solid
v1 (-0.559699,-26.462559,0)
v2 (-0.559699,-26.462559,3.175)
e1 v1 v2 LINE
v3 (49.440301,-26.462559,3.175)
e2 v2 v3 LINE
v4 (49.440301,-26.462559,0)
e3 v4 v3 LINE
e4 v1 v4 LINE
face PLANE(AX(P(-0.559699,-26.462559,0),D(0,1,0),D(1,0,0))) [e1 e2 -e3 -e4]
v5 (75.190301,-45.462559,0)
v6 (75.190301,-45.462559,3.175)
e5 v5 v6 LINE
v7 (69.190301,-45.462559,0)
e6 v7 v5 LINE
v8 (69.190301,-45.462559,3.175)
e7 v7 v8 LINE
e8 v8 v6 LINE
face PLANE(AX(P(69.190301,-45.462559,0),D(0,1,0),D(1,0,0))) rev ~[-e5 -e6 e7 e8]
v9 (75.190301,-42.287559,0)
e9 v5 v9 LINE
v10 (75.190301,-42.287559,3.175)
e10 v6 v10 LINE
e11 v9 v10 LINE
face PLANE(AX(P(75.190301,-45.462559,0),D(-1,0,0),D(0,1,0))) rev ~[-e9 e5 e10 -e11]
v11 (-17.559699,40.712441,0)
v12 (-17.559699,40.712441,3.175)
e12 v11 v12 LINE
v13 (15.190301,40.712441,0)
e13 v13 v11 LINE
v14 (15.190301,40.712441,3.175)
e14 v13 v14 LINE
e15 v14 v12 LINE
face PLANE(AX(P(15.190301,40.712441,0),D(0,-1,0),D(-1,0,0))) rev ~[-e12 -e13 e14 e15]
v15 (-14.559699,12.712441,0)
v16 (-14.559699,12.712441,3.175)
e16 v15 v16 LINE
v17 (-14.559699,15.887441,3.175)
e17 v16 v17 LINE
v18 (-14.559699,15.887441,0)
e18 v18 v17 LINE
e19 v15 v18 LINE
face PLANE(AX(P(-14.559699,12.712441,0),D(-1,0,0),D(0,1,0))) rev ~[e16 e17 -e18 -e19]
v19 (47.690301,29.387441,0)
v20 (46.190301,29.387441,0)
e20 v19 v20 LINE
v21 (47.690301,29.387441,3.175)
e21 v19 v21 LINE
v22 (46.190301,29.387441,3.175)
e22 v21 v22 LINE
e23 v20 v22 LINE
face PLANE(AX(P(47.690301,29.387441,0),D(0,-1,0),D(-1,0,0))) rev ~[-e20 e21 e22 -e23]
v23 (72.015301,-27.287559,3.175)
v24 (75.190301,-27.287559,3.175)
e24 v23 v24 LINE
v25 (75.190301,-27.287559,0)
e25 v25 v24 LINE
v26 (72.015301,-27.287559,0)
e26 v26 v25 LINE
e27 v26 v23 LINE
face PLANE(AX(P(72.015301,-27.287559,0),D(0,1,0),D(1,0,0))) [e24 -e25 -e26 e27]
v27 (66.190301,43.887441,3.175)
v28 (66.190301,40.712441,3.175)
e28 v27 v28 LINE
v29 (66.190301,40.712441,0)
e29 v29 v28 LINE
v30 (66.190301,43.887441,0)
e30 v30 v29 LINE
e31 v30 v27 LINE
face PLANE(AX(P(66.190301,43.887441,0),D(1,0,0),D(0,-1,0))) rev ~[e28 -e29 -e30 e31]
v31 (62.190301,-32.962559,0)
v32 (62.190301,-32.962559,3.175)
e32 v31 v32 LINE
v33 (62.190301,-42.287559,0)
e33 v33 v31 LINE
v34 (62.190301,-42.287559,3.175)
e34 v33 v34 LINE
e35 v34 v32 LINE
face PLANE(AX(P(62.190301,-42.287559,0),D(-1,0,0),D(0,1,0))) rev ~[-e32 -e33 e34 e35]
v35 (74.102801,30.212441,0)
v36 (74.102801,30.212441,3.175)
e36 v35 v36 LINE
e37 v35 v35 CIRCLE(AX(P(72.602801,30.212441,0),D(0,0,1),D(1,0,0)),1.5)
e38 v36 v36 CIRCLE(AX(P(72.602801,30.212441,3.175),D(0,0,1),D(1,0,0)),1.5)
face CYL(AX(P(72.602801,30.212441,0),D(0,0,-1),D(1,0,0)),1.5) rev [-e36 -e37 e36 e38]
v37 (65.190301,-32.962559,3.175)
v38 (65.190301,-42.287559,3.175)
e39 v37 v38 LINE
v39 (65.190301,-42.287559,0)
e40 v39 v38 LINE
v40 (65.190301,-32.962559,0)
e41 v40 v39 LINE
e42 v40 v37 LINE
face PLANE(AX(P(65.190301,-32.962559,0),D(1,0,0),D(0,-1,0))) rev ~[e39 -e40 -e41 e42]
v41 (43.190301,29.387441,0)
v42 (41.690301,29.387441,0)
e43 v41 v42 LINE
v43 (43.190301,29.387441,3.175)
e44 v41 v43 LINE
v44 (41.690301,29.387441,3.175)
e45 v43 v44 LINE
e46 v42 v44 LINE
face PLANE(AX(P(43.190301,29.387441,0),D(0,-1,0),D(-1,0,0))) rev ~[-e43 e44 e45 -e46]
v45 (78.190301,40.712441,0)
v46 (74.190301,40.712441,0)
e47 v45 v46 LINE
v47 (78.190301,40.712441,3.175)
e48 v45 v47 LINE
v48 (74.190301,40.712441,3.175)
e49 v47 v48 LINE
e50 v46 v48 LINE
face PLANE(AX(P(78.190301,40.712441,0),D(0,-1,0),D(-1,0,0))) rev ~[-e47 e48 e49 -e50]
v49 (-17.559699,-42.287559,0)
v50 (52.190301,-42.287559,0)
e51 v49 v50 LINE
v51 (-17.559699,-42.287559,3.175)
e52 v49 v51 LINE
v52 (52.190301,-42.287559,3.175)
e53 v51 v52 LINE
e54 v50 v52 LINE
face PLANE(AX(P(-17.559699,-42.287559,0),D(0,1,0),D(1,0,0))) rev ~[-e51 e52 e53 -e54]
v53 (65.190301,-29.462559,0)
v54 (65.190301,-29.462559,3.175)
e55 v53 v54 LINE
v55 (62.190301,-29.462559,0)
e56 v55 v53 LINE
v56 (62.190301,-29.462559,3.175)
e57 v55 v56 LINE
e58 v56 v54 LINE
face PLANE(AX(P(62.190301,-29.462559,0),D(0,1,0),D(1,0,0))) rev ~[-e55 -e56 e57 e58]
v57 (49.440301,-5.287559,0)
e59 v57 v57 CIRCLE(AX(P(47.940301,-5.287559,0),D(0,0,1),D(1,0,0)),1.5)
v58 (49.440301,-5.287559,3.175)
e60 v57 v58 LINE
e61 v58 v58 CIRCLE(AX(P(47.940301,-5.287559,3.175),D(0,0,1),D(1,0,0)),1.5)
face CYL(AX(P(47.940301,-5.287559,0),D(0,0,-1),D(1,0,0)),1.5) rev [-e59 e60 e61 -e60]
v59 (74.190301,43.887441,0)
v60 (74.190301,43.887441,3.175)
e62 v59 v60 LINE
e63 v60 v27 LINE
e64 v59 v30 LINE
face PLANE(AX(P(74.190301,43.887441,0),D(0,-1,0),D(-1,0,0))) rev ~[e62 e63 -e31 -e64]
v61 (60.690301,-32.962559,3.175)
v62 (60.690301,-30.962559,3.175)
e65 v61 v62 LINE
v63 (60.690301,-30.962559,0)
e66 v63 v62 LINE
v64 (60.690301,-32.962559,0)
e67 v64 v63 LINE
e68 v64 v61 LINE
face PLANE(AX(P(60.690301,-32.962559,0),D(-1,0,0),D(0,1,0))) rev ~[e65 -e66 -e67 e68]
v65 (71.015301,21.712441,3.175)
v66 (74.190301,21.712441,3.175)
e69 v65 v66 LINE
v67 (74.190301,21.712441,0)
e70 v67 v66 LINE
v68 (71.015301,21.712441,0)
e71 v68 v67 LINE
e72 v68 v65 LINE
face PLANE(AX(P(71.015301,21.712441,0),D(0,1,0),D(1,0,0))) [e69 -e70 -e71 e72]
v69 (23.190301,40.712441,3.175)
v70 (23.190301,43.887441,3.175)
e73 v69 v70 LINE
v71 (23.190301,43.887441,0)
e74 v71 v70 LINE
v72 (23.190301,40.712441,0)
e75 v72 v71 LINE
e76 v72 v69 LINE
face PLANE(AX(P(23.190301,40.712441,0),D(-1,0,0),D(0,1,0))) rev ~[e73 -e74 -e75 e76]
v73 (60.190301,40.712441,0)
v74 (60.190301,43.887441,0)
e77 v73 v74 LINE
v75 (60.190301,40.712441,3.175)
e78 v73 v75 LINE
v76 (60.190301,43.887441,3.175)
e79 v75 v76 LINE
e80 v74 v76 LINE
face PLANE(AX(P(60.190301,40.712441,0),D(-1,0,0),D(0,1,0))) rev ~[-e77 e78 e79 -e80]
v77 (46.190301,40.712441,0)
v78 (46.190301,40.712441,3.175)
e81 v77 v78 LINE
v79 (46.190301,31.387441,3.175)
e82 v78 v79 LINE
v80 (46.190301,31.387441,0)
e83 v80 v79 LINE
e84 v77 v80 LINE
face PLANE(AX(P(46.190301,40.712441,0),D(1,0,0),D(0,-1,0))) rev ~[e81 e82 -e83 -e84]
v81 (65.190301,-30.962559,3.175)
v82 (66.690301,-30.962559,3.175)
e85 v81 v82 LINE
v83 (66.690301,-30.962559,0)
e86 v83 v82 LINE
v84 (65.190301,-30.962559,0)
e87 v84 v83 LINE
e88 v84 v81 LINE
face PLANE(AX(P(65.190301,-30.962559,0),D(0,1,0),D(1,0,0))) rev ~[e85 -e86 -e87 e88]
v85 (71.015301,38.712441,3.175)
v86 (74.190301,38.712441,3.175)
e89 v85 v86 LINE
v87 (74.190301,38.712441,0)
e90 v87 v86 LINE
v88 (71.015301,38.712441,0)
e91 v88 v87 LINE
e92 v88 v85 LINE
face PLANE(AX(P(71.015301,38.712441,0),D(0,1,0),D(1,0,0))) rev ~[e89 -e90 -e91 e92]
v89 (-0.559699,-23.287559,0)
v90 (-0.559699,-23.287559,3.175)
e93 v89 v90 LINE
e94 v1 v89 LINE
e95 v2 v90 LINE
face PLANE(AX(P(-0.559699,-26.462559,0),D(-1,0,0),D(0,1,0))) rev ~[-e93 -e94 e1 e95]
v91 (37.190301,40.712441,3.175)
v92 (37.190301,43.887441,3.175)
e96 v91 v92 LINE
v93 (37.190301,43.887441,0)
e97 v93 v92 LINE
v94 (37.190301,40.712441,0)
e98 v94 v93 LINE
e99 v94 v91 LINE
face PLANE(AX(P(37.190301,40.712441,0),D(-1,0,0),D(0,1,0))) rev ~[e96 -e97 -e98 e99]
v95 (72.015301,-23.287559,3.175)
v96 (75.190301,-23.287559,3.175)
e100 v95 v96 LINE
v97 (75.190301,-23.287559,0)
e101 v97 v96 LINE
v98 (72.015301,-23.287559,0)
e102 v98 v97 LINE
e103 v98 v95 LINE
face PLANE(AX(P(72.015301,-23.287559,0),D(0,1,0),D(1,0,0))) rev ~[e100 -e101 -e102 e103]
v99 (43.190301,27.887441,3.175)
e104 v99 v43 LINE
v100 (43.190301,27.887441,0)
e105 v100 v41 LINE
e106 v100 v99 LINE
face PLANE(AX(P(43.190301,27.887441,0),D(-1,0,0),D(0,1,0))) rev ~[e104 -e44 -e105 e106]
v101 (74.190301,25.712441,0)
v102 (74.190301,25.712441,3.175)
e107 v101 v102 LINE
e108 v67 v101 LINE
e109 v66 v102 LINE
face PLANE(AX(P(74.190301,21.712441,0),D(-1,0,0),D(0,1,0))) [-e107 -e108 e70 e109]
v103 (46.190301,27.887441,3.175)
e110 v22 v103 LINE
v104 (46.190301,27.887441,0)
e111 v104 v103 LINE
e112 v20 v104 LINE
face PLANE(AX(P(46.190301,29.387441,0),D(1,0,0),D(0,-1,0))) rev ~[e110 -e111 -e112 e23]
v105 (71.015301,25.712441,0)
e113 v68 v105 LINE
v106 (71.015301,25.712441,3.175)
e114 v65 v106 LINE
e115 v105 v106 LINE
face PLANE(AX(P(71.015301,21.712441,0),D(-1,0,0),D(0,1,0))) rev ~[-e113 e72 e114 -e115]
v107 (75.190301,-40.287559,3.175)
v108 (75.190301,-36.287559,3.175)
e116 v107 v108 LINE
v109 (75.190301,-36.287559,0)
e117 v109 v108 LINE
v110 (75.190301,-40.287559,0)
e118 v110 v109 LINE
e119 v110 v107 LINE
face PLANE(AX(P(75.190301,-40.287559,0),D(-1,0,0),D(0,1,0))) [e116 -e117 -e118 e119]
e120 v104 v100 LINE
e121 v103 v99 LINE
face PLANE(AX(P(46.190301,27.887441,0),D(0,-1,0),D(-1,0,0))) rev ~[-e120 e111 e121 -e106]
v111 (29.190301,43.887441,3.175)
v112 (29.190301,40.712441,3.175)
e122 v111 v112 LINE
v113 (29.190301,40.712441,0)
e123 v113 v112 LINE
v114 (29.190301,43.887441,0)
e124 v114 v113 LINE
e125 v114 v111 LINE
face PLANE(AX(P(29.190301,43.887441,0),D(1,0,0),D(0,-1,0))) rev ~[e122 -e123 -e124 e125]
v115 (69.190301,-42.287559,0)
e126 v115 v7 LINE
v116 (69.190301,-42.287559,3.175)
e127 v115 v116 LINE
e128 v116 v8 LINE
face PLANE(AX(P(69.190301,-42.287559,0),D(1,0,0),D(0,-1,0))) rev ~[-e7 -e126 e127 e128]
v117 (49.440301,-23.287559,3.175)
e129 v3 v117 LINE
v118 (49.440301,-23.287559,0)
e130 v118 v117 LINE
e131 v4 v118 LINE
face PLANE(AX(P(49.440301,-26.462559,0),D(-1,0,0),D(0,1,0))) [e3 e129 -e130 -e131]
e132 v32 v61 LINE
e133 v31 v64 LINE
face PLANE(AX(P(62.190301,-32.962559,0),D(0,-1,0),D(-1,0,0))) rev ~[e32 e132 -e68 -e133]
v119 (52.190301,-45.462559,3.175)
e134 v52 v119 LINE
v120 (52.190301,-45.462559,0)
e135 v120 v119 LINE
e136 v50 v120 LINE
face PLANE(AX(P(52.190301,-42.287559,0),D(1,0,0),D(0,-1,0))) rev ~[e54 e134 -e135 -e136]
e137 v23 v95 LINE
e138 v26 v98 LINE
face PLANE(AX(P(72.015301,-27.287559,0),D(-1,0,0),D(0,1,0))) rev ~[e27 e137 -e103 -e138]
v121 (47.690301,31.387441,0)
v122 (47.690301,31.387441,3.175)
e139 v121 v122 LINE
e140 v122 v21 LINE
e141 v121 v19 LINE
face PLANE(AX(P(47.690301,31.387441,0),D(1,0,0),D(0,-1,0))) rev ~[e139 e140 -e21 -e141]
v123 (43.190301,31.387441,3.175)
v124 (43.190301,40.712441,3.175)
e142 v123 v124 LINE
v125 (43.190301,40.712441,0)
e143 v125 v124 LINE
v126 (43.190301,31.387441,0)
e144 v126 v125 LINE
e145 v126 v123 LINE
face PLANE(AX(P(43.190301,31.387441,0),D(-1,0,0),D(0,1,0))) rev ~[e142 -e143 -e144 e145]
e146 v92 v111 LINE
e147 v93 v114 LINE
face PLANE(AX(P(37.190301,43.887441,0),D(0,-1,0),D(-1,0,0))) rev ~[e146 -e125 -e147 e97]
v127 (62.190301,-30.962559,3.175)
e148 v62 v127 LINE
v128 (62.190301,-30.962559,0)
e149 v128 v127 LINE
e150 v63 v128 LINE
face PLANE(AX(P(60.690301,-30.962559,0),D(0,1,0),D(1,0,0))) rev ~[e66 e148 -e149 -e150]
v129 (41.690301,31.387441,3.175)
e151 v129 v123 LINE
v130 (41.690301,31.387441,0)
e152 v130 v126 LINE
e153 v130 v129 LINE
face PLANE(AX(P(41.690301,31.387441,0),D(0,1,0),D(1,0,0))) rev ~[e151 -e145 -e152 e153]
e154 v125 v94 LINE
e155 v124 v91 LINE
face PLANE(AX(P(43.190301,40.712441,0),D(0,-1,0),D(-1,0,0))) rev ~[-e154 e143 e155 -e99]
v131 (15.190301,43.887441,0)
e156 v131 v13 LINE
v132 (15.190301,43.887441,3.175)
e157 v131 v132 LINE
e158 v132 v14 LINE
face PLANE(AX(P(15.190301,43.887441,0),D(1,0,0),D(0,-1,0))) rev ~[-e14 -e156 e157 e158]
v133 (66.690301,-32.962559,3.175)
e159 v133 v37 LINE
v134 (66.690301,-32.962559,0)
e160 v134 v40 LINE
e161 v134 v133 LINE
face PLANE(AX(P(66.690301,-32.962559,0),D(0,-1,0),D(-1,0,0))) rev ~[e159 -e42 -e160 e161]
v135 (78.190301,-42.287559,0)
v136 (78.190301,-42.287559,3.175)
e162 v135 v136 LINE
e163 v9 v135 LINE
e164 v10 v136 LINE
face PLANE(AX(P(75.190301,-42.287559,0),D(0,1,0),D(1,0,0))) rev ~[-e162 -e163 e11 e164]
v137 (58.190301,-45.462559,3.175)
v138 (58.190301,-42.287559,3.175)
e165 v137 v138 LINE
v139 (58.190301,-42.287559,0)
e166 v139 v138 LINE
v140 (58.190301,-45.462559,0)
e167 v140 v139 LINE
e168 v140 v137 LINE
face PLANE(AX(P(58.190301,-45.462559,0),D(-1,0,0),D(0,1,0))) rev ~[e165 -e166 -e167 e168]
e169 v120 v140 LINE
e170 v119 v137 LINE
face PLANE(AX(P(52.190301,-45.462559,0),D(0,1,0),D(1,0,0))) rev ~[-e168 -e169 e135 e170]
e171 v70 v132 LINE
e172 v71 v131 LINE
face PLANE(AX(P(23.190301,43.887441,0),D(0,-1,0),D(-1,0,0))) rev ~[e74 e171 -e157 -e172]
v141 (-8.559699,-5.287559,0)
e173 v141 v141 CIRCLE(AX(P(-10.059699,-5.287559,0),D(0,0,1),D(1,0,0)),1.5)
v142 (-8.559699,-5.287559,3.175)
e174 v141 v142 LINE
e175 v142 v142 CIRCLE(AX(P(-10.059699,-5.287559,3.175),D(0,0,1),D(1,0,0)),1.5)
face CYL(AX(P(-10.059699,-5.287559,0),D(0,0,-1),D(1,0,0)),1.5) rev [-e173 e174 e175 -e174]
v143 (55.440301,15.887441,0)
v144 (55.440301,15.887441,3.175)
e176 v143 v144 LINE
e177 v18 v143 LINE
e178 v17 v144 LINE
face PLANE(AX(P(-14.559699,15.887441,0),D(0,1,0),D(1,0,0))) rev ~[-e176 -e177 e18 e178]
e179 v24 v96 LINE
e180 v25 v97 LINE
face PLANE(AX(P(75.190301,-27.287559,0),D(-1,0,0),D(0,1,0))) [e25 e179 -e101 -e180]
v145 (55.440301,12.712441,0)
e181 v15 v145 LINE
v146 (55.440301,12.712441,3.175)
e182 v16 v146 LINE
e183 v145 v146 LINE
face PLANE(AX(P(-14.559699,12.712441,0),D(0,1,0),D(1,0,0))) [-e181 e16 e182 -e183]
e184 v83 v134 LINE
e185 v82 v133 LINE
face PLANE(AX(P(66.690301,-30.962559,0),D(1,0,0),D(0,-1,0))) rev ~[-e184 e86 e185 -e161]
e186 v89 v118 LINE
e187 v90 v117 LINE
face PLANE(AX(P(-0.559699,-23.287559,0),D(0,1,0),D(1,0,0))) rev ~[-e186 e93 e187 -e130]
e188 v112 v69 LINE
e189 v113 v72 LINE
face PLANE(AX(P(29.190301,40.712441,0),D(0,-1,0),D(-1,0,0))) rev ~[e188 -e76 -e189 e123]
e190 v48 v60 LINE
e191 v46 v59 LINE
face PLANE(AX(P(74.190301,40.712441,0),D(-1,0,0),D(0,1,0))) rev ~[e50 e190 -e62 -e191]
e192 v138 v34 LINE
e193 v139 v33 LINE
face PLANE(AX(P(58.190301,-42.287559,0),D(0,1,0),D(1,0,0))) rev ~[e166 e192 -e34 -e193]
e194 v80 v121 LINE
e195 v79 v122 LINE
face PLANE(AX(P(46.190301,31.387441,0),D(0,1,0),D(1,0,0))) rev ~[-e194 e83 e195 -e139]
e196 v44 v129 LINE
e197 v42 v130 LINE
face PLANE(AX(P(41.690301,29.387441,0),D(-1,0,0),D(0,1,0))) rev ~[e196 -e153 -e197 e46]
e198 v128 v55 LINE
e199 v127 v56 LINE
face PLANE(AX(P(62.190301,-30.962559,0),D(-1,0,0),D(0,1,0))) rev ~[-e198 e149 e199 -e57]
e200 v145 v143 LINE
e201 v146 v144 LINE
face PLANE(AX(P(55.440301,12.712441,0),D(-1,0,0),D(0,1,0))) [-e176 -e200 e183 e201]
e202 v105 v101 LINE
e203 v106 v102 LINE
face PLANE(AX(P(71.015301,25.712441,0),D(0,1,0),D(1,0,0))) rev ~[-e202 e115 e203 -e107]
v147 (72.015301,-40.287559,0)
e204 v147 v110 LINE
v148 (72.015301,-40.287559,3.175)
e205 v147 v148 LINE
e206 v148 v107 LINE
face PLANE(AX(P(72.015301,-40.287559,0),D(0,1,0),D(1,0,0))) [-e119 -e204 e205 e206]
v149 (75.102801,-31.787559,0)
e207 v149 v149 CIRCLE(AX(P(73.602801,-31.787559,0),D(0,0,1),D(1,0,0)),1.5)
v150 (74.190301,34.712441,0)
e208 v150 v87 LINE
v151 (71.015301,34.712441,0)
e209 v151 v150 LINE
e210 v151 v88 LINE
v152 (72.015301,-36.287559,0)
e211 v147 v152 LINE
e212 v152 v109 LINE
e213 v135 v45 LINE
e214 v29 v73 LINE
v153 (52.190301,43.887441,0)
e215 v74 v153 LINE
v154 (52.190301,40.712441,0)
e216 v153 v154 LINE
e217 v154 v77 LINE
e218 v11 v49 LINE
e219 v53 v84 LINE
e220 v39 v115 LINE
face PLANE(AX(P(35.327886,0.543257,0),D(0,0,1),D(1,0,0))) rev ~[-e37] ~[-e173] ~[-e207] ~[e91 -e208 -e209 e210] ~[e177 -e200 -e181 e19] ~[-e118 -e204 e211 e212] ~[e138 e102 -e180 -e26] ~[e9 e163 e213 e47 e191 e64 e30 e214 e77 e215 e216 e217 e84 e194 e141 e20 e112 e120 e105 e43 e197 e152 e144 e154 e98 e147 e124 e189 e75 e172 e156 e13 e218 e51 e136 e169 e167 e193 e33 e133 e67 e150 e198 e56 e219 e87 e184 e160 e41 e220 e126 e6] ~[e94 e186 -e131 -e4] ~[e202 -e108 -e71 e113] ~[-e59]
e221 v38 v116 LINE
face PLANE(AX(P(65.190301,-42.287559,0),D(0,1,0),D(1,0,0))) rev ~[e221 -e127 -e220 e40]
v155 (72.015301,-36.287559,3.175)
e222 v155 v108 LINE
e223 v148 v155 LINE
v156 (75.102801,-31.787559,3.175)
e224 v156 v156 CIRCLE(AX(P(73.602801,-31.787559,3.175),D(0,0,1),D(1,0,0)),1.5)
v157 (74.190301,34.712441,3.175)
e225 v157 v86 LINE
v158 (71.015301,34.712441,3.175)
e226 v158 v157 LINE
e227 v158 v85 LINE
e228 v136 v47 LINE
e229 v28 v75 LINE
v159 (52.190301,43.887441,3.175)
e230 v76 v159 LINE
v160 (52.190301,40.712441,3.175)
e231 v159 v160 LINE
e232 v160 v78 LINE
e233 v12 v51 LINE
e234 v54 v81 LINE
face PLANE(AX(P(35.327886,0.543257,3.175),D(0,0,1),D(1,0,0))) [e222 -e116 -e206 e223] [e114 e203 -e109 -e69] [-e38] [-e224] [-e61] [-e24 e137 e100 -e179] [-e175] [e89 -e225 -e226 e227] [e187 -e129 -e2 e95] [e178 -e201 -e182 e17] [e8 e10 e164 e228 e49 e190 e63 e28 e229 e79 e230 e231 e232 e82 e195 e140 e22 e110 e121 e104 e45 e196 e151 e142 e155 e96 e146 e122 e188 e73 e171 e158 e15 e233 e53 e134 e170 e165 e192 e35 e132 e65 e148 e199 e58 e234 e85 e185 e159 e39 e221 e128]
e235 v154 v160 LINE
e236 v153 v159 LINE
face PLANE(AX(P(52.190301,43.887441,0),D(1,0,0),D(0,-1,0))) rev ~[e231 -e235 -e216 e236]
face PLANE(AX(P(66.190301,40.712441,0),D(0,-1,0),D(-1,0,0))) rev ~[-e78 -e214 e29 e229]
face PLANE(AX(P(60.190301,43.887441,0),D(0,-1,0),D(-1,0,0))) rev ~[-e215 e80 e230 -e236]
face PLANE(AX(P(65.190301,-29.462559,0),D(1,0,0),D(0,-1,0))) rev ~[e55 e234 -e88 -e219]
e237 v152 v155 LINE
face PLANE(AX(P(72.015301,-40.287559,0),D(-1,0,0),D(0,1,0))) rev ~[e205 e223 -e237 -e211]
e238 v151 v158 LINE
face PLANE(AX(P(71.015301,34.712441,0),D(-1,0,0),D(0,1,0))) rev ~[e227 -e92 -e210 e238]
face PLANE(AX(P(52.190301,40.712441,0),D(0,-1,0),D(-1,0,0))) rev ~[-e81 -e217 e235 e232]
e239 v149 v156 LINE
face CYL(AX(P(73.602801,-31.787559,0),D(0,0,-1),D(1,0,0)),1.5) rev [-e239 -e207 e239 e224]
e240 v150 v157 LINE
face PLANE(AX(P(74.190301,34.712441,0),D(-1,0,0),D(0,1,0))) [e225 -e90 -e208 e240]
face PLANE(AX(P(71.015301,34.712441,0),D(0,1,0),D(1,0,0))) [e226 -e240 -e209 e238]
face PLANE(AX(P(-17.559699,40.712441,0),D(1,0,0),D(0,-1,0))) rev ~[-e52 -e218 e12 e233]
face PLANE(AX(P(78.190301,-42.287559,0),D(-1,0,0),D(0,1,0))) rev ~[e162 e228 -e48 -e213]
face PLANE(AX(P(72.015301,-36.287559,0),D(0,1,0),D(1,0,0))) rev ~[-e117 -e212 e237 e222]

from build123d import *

# Parameters (mm, degrees)
F0_W     = 50
F0_H     = 3.175
F0_R     = 1.5
F0_W_2   = 3.175
F0_H_2   = 4
F0_W_3   = 70
F1_DEPTH = 3.175


# Not quite as in the source:
# - a length typed as a fraction of an inch, garbled in the dataset ("3 / 203.2 mm" for 3/8 in), is restored
# - a feature names something its author has since deleted; it is built from what else it names


with BuildPart() as f1:
    # F0 (on Top) → F1 (new body)
    with BuildSketch(Plane.XY):
        Polygon((46.1903014183, 27.8874409974), (43.1903014183, 27.8874409974), (43.1903014183, 29.3874409974), (41.6903014183, 29.3874409974), (41.6903014183, 31.3874409974), (43.1903014183, 31.3874409974), (43.1903014183, 40.7124409974), (37.1903014183, 40.7124409974), (37.1903014183, 43.8874409974), (29.1903014183, 43.8874409974), (29.1903014183, 40.7124409974), (23.1903014183, 40.7124409974), (23.1903014183, 43.8874409974), (15.1903014183, 43.8874409974), (15.1903014183, 40.7124409974), (-17.5596985817, 40.7124409974), (-17.5596985817, -42.2875590026), (52.1903014183, -42.2875590026), (52.1903014183, -45.4625590026), (58.1903014183, -45.4625590026), (58.1903014183, -42.2875590026), (62.1903014183, -42.2875590026), (62.1903014183, -32.9625590026), (60.6903014183, -32.9625590026), (60.6903014183, -30.9625590026), (62.1903014183, -30.9625590026), (62.1903014183, -29.4625590026), (65.1903014183, -29.4625590026), (65.1903014183, -30.9625590026), (66.6903014183, -30.9625590026), (66.6903014183, -32.9625590026), (65.1903014183, -32.9625590026), (65.1903014183, -42.2875590026), (69.1903014183, -42.2875590026), (69.1903014183, -45.4625590026), (75.1903014183, -45.4625590026), (75.1903014183, -42.2875590026), (78.1903014183, -42.2875590026), (78.1903014183, 40.7124409974), (74.1903014183, 40.7124409974), (74.1903014183, 43.8874409974), (66.1903014183, 43.8874409974), (66.1903014183, 40.7124409974), (60.1903014183, 40.7124409974), (60.1903014183, 43.8874409974), (52.1903014183, 43.8874409974), (52.1903014183, 40.7124409974), (46.1903014183, 40.7124409974), (46.1903014183, 31.3874409974), (47.6903014183, 31.3874409974), (47.6903014183, 29.3874409974), (46.1903014183, 29.3874409974), align=None)
        with Locations((24.4403014183, -24.8750590026)):
            Rectangle(F0_W, F0_H, mode=Mode.SUBTRACT)
        with Locations((-10.0596985817, -5.2875590026)):
            Circle(F0_R, mode=Mode.SUBTRACT)
        with Locations((73.6028014183, -38.2875590026)):
            Rectangle(F0_W_2, F0_H_2, mode=Mode.SUBTRACT)
        with Locations((73.6028014183, -31.7875590026)):
            Circle(F0_R, mode=Mode.SUBTRACT)
        with Locations((73.6028014183, -25.2875590026)):
            Rectangle(F0_W_2, F0_H_2, mode=Mode.SUBTRACT)
        with Locations((47.9403014183, -5.2875590026)):
            Circle(F0_R, mode=Mode.SUBTRACT)
        with Locations((20.4403014183, 14.2999409974)):
            Rectangle(F0_W_3, F0_H, mode=Mode.SUBTRACT)
        with Locations((72.6028014183, 23.7124409974)):
            Rectangle(F0_W_2, F0_H_2, mode=Mode.SUBTRACT)
        with Locations((72.6028014183, 30.2124409974)):
            Circle(F0_R, mode=Mode.SUBTRACT)
        with Locations((72.6028014183, 36.7124409974)):
            Rectangle(F0_W_2, F0_H_2, mode=Mode.SUBTRACT)
    extrude(amount=F1_DEPTH)


solid = f1.part
